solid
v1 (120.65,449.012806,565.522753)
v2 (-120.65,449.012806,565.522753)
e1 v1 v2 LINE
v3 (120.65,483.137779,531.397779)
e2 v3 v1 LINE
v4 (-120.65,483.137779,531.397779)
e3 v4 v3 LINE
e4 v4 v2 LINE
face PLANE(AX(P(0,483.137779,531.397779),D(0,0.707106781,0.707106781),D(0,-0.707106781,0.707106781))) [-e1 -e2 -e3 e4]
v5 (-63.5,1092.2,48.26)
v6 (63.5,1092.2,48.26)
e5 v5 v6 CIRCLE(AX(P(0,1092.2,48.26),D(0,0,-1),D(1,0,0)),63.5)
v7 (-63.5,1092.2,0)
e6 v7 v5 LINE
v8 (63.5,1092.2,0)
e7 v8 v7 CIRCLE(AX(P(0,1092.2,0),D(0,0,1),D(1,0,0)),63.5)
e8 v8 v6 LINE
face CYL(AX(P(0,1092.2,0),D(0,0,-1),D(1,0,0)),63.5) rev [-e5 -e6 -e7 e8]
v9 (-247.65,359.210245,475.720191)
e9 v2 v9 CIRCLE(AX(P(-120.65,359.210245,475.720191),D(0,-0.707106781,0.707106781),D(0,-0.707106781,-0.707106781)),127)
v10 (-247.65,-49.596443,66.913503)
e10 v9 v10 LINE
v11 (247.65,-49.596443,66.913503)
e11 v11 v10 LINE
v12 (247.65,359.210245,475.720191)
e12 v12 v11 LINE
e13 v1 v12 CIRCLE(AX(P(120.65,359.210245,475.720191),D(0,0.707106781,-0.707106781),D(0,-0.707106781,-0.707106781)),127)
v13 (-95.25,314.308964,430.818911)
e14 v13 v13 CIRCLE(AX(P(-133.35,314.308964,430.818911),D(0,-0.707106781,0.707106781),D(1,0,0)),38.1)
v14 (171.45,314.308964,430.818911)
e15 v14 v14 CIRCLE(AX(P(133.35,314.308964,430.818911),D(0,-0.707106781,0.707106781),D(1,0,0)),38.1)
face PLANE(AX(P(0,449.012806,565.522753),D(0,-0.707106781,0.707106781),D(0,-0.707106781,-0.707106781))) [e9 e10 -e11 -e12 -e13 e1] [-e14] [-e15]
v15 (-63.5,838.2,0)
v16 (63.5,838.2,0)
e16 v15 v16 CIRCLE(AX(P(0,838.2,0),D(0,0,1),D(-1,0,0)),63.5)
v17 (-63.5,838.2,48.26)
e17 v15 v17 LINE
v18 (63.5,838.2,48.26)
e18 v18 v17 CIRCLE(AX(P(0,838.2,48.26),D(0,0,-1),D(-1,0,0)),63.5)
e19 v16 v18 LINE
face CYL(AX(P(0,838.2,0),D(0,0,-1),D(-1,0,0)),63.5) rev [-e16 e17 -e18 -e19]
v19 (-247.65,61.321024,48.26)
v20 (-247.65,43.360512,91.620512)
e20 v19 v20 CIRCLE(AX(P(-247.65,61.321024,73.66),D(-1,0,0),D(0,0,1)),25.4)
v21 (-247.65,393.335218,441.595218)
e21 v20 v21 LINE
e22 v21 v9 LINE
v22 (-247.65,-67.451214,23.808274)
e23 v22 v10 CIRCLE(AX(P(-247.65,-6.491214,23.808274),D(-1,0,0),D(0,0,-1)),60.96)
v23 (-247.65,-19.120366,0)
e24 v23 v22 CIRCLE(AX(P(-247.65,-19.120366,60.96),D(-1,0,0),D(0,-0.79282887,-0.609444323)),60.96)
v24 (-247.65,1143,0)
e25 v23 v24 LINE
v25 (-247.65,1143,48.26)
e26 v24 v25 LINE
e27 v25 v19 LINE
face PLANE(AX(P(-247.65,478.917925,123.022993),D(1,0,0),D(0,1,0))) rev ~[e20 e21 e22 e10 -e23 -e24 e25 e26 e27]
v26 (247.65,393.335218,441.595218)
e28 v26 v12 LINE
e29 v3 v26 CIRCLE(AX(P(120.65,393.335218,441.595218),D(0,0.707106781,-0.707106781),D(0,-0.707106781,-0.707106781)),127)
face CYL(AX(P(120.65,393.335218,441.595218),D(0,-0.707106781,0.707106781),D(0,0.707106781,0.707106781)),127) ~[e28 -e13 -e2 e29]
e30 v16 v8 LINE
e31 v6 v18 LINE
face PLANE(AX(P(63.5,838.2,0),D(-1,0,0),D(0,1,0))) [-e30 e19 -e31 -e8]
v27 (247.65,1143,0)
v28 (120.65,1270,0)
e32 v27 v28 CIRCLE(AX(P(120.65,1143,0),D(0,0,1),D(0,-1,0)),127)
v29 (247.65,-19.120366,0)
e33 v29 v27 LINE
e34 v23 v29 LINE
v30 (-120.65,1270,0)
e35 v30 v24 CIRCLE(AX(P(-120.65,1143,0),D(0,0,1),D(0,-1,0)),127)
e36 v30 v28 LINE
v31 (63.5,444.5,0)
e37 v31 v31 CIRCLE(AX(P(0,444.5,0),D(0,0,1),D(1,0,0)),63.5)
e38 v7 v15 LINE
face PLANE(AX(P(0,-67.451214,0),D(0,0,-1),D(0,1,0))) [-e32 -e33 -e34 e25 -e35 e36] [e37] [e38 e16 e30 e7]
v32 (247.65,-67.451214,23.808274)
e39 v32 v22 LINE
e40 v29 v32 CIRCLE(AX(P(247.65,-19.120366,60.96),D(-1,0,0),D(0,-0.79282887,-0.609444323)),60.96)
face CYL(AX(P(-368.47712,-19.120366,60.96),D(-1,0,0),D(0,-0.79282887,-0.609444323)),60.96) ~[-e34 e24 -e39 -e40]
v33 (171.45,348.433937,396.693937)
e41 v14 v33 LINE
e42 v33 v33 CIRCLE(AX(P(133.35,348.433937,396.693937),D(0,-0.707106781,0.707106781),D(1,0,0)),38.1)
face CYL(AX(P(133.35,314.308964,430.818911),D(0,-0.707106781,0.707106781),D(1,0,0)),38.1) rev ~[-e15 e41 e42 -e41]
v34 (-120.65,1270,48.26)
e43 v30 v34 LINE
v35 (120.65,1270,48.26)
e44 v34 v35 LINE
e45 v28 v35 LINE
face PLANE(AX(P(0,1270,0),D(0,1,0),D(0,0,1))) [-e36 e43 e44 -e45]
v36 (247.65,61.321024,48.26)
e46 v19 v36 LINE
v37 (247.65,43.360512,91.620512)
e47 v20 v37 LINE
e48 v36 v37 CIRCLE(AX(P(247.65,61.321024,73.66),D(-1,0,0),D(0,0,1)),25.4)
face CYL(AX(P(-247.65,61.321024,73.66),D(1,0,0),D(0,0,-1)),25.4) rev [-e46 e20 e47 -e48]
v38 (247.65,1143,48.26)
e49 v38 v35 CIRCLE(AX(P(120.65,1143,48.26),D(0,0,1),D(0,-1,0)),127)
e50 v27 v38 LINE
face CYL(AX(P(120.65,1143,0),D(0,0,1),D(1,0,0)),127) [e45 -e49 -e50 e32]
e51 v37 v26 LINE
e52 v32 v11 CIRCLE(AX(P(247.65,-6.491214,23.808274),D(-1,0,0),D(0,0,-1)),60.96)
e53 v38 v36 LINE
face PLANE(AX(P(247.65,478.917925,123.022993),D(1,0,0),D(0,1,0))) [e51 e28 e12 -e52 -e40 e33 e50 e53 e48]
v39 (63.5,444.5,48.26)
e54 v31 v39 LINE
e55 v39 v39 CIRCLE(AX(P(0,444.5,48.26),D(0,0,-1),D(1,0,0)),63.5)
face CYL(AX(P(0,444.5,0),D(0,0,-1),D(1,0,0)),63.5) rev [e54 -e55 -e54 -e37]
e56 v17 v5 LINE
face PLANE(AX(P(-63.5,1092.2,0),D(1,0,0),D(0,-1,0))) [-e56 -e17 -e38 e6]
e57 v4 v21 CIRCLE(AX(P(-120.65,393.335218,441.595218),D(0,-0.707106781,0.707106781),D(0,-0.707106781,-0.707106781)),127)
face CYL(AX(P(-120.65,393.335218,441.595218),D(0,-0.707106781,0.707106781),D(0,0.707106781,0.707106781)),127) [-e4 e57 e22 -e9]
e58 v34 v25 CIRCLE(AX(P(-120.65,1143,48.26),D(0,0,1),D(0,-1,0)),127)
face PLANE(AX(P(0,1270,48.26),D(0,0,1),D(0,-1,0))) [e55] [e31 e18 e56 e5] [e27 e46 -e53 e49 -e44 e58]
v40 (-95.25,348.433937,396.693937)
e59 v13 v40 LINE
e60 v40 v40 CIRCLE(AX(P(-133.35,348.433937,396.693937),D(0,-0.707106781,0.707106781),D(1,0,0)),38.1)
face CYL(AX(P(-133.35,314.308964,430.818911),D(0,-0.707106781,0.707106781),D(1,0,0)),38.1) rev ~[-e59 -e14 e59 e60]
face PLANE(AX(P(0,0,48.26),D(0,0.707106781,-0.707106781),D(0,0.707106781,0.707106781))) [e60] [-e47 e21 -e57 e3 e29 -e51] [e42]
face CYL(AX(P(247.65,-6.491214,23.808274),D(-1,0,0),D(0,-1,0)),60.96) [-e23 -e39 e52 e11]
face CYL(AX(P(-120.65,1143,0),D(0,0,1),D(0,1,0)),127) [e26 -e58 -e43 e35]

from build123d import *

# Parameters (mm, degrees)
F1_DEPTH    = 247.65
F2_R        = 127
F3_R        = 25.4
F4_R        = 60.96
F5_T1_DEPTH = 736.9542394832
F6_R        = 38.1
F7_DEPTH    = 132.08
F8_R        = 63.5
F9_DEPTH    = 111.76


# Not quite as in the source:
# - a fillet or chamfer that OpenCascade refuses, or shapes differently, is made with other operations: its cross-section is extruded or revolved along the edge and cut away or added


with BuildPart() as f1:
    # F0 (on Right) → F1 (new body, symmetric)
    with BuildSketch(Plane.YZ):
        Polygon((-67.451213715, 0), (0, 0), (1270, 0), (1270, 48.26), (0, 48.26), (483.1377793135, 531.3977793135), (449.0128060535, 565.5227525736), (0, 116.5099465201), (-67.451213715, 49.0587328052), align=None)
    extrude(amount=F1_DEPTH, both=True)

    # F2
    f2_edges = [f1.edges().sort_by_distance(p)[0] for p in [
        (247.65, 466.075293, 548.460266),
        (-247.65, 466.075293, 548.460266),
        (247.65, 1270, 24.13),
        (-247.65, 1270, 24.13),
    ]]
    fillet(f2_edges, radius=F2_R)

    # F3
    f3_edges = [f1.edges().sort_by_distance(p)[0] for p in [
        (0, 0, 48.26),
    ]]
    fillet(f3_edges, radius=F3_R)

    # F4
    f4_edges = [f1.edges().sort_by_distance(p)[0] for p in [
        (0, -67.451214, 49.058733),
    ]]
    fillet(f4_edges, radius=F4_R)

    # F5: fillet of radius 60.96 on 1 edges, made by hand

    # F5_s2 → F5_t1 (cut)
    with BuildSketch(Plane.YZ.offset(-368.4771197416)):
        with BuildLine():
            ThreePointArc((-67.451213715, 23.8082740429), (-46.0587435131, 6.2750349075), (-19.1203658183, 0))
            Line((-19.1203658183, 0), (-67.451213715, 0))
            Line((-67.451213715, 0), (-67.451213715, 23.8082740429))
        make_face()
    extrude(amount=F5_T1_DEPTH, mode=Mode.SUBTRACT)

    # F6 (on face) → F7 (cut)
    with BuildSketch(Plane(origin=(0, -58.2549732601, 58.2549732601), x_dir=(1, 0, 0), z_dir=(0, -0.7071067812, 0.7071067812))):
        with Locations((-133.35, 526.8849732601)):
            Circle(F6_R)
        with Locations((133.35, 526.8849732601)):
            Circle(F6_R)
    extrude(amount=-F7_DEPTH, mode=Mode.SUBTRACT)

    # F8 (on Top) → F9 (cut)
    with BuildSketch(Plane.XY):
        with Locations((0, 444.5)):
            Circle(F8_R)
        with BuildLine():
            Line((-63.5, 838.2), (63.5, 838.2))
            ThreePointArc((63.5, 838.2), (0, 901.7), (-63.5, 838.2))
        make_face()
        with BuildLine():
            ThreePointArc((-63.5, 838.2), (0, 774.7), (63.5, 838.2))
            Line((63.5, 838.2), (-63.5, 838.2))
        make_face()
        with BuildLine():
            ThreePointArc((-63.5, 838.2), (0, 901.7), (63.5, 838.2))
            Line((63.5, 838.2), (63.5, 1092.2))
            ThreePointArc((63.5, 1092.2), (0, 1028.7), (-63.5, 1092.2))
            Line((-63.5, 1092.2), (-63.5, 838.2))
        make_face()
        with BuildLine():
            Line((-63.5, 1092.2), (63.5, 1092.2))
            ThreePointArc((63.5, 1092.2), (0, 1155.7), (-63.5, 1092.2))
        make_face()
        with BuildLine():
            ThreePointArc((-63.5, 1092.2), (0, 1028.7), (63.5, 1092.2))
            Line((63.5, 1092.2), (-63.5, 1092.2))
        make_face()
    extrude(amount=F9_DEPTH, mode=Mode.SUBTRACT)


solid = f1.part
